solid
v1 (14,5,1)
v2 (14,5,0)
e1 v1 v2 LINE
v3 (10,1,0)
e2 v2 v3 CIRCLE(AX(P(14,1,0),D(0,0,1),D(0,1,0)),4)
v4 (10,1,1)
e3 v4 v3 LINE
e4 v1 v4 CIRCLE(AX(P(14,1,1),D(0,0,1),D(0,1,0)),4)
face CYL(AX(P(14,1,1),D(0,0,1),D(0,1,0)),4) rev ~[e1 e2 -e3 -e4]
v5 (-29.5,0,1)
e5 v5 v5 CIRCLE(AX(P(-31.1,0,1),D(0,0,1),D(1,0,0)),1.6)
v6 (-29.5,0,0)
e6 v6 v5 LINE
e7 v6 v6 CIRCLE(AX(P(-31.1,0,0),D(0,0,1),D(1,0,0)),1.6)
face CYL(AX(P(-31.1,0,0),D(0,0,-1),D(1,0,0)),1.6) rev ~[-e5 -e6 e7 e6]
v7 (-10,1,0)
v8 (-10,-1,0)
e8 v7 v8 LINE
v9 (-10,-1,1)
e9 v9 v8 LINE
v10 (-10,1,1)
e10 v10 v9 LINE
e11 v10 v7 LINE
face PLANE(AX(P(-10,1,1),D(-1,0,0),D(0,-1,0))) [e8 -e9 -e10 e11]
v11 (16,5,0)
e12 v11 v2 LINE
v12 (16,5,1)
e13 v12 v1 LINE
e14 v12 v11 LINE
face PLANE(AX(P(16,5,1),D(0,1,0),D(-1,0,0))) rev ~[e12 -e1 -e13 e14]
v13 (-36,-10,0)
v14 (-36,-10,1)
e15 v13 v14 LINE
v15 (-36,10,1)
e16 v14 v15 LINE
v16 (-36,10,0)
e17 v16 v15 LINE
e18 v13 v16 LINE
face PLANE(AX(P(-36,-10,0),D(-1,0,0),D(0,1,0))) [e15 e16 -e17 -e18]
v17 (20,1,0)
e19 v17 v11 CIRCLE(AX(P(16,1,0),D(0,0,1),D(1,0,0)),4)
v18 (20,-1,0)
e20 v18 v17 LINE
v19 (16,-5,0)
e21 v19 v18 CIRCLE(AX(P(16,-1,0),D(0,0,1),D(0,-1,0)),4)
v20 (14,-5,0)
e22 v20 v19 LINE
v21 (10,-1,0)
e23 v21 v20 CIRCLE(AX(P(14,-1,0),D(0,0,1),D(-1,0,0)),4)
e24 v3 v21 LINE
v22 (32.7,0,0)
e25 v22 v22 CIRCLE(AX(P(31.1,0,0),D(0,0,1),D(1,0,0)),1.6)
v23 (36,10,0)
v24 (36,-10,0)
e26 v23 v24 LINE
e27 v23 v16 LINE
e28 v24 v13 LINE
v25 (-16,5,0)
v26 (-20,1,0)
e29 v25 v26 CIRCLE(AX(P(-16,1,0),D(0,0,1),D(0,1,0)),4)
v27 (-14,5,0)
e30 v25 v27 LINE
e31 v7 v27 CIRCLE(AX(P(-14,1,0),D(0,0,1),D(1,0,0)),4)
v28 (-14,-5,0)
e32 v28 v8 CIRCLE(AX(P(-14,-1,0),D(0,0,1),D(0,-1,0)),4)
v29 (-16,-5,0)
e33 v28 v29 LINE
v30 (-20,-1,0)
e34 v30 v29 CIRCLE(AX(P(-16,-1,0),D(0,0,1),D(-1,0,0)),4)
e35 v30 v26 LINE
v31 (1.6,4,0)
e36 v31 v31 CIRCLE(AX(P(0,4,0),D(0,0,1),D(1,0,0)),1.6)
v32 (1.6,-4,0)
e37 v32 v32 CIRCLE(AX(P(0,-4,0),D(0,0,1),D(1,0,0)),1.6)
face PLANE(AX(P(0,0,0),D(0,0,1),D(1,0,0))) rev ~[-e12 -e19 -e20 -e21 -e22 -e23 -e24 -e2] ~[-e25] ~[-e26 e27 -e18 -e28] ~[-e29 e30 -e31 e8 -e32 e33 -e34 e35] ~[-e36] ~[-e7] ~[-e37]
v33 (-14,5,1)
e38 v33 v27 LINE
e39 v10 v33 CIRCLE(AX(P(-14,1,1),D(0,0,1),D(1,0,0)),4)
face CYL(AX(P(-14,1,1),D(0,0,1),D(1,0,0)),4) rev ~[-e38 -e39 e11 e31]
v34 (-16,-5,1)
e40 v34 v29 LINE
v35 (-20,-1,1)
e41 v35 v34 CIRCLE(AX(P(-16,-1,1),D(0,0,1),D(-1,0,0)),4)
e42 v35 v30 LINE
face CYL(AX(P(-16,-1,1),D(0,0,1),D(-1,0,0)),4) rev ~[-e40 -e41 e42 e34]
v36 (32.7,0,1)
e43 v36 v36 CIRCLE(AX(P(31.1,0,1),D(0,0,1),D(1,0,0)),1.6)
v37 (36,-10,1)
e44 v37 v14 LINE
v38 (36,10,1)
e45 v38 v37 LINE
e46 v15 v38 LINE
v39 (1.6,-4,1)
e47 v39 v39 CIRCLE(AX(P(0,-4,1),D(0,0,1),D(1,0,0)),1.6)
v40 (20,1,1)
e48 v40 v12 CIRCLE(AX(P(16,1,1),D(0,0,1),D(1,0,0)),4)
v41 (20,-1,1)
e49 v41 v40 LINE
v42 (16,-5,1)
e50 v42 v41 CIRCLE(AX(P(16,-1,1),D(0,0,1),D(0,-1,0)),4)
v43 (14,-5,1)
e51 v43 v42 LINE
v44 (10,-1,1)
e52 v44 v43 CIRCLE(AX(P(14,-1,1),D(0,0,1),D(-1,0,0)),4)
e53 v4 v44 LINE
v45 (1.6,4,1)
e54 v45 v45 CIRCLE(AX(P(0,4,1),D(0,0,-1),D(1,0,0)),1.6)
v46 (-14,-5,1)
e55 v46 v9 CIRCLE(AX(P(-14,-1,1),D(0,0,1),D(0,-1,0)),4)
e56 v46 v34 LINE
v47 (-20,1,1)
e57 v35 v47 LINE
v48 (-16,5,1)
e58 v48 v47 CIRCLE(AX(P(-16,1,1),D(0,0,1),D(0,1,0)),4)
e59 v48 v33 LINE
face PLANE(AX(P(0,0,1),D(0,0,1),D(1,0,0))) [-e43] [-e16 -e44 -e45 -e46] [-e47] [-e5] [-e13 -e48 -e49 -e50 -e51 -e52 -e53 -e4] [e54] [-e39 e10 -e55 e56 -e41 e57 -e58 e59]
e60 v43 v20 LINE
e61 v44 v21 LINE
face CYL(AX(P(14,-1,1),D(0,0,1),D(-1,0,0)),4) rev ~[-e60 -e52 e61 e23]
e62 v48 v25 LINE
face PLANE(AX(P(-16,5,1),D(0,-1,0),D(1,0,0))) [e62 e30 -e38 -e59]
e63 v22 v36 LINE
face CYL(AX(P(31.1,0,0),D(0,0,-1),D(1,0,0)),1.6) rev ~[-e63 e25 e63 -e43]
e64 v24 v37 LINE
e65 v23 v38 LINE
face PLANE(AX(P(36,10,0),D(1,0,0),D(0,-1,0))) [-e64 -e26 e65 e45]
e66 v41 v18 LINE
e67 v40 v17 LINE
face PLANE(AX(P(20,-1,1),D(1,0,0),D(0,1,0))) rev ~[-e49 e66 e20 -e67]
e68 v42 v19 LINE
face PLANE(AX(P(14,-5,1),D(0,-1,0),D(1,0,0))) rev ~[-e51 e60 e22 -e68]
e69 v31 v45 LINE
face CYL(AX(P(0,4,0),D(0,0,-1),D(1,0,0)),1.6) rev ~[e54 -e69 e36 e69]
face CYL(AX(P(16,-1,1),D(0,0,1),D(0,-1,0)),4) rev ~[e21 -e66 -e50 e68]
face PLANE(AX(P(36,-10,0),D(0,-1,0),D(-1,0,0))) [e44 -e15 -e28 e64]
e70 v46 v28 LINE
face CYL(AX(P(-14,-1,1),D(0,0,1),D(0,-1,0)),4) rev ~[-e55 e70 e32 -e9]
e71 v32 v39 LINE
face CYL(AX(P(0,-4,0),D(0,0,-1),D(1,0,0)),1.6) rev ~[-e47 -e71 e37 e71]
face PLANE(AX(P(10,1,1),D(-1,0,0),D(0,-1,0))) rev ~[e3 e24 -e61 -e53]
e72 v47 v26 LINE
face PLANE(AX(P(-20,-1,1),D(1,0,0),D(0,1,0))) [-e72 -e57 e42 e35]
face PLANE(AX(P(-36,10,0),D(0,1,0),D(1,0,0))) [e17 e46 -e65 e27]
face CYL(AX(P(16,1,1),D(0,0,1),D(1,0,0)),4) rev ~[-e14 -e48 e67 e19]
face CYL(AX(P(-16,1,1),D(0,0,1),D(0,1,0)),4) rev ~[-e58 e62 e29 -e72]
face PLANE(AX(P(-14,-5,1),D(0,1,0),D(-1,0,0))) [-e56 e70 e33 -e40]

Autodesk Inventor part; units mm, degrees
ref_plane "YZ Plane" through (0, 0, 0) normal (1, 0, 0) x (0, 1, 0)
ref_plane "XZ Plane" through (0, 0, 0) normal (0, 1, 0) x (-1, 0, 0)
ref_plane "XY Plane" through (0, 0, 0) normal (0, 0, 1) x (1, 0, 0)
sketch "Sketch2" plane through (0, 0, 1) normal (0, 0, 1) x (1, 0, 0)
  line L0 (-17.5, 32.5) -> (-12.5, 32.5)
  line L1 (-7.5, 27.5) -> (-7.5, 12.5)
  line L2 (-12.5, 7.5) -> (-17.5, 7.5)
  line L3 (-22.5, 12.5) -> (-22.5, 27.5)
  line L4 (-22.5, 32.5) -> (-7.5, 7.5) construction
  line L5 (-7.5, 32.5) -> (-22.5, 7.5) construction
  line L6 (-15.4861, 0) -> (17.9861, 0)
  line L7 (0, 18.4722) -> (0, -18.4722)
  arc A0 (-17.5, 32.5) -> (-22.5, 27.5) centre (-17.5, 27.5) ccw
  arc A1 (-7.5, 27.5) -> (-12.5, 32.5) centre (-12.5, 27.5) ccw
  arc A2 (-12.5, 7.5) -> (-7.5, 12.5) centre (-12.5, 12.5) ccw
  arc A3 (-22.5, 12.5) -> (-17.5, 7.5) centre (-17.5, 12.5) ccw
  line L8 (17.5, 32.5) -> (12.5, 32.5)
  line L9 (7.5, 27.5) -> (7.5, 12.5)
  line L10 (12.5, 7.5) -> (17.5, 7.5)
  line L11 (22.5, 12.5) -> (22.5, 27.5)
  line L12 (22.5, 32.5) -> (7.5, 7.5) construction
  line L13 (7.5, 32.5) -> (22.5, 7.5) construction
  arc A4 (22.5, 27.5) -> (17.5, 32.5) centre (17.5, 27.5) ccw
  arc A5 (12.5, 32.5) -> (7.5, 27.5) centre (12.5, 27.5) ccw
  arc A6 (7.5, 12.5) -> (12.5, 7.5) centre (12.5, 12.5) ccw
  arc A7 (17.5, 7.5) -> (22.5, 12.5) centre (17.5, 12.5) ccw
  line L14 (-17.5, -32.5) -> (-12.5, -32.5)
  line L15 (-7.5, -27.5) -> (-7.5, -12.5)
  line L16 (-12.5, -7.5) -> (-17.5, -7.5)
  line L17 (-22.5, -12.5) -> (-22.5, -27.5)
  line L18 (-22.5, -32.5) -> (-7.5, -7.5) construction
  line L19 (-7.5, -32.5) -> (-22.5, -7.5) construction
  arc A8 (-22.5, -27.5) -> (-17.5, -32.5) centre (-17.5, -27.5) ccw
  arc A9 (-12.5, -32.5) -> (-7.5, -27.5) centre (-12.5, -27.5) ccw
  arc A10 (-7.5, -12.5) -> (-12.5, -7.5) centre (-12.5, -12.5) ccw
  arc A11 (-17.5, -7.5) -> (-22.5, -12.5) centre (-17.5, -12.5) ccw
  line L20 (12.5, -7.5) -> (17.5, -7.5)
  line L21 (7.5, -27.5) -> (7.5, -12.5)
  arc A12 (22.5, -12.5) -> (17.5, -7.5) centre (17.5, -12.5) ccw
  arc A13 (7.5, -27.5) -> (12.5, -32.5) centre (12.5, -27.5) ccw
  line L22 (17.5, -32.5) -> (12.5, -32.5)
  line L23 (7.5, -32.5) -> (22.5, -7.5) construction
  line L24 (22.5, -32.5) -> (7.5, -7.5) construction
  line L25 (22.5, -12.5) -> (22.5, -27.5)
  arc A14 (17.5, -32.5) -> (22.5, -27.5) centre (17.5, -27.5) ccw
  arc A15 (12.5, -7.5) -> (7.5, -12.5) centre (12.5, -12.5) ccw
  point P0 (0, 0)
  point P1 (-15, 20)
  point P2 (15, 20)
  point P3 (-15, -20)
  point P4 (15, -20)
  dimension "d11" = 15
  dimension "d12" = 15
  dimension "d13" = 25
  dimension "d14" = 15
  dimension "d15" = 5
sketch "Sketch1" plane through (0, 0, 0) normal (0, 0, 1) x (1, 0, 0)
  line L0 (-36, 10) -> (36, 10)
  line L1 (36, 10) -> (36, -10)
  line L2 (36, -10) -> (-36, -10)
  line L3 (-36, -10) -> (-36, 10)
  line L4 (-36, 10) -> (36, -10) construction
  line L5 (36, 10) -> (-36, -10) construction
  circle A0 centre (31.1, 0) radius 1.6
  line L6 (0, 0) -> (12.8976, 0)
  line L7 (0, 0) -> (0, 11.3109)
  circle A1 centre (-31.1, 0) radius 1.6
  circle A2 centre (0, -4) radius 1.6
  circle A3 centre (0, 4) radius 1.6
  dimension "d0" = 72
  dimension "d1" = 20
  dimension "d2" = 3.2
  dimension "d3" = 4.9
  dimension "d6" = 3.2
  dimension "d7" = 6
extrude "Plate1" add sketch "Sketch1" along normal blind 1
sketch "Sketch3" plane through (0, 0, 1) normal (0, 0, 1) x (1, 0, 0)
  line L0 (-16, 5) -> (-14, 5)
  line L1 (-10, 1) -> (-10, -1)
  line L2 (-14, -5) -> (-16, -5)
  line L3 (-20, -1) -> (-20, 1)
  line L4 (-20, 5) -> (-10, -5) construction
  line L5 (-10, 5) -> (-20, -5) construction
  arc A0 (-16, 5) -> (-20, 1) centre (-16, 1) ccw
  arc A1 (-20, -1) -> (-16, -5) centre (-16, -1) ccw
  arc A2 (-14, -5) -> (-10, -1) centre (-14, -1) ccw
  arc A3 (-10, 1) -> (-14, 5) centre (-14, 1) ccw
  line L6 (0, 0) -> (0, 13.3665)
  line L7 (16, 5) -> (14, 5)
  line L8 (10, 1) -> (10, -1)
  line L9 (14, -5) -> (16, -5)
  line L10 (20, -1) -> (20, 1)
  line L11 (20, 5) -> (10, -5) construction
  line L12 (10, 5) -> (20, -5) construction
  arc A4 (20, 1) -> (16, 5) centre (16, 1) ccw
  arc A5 (16, -5) -> (20, -1) centre (16, -1) ccw
  arc A6 (10, -1) -> (14, -5) centre (14, -1) ccw
  arc A7 (14, 5) -> (10, 1) centre (14, 1) ccw
  point P0 (-15, 0)
  point P1 (15, 0)
  dimension "d18" = 10
  dimension "d19" = 10
  dimension "d20" = 4
  dimension "d21" = 20
extrude "Cut2" cut sketch "Sketch3" against normal blind 1
equation "\"d22\" = 厚度"
equation "\"d5\" = 厚度"
equation "\"折彎半徑\" = 厚度"
equation "\"折彎離隙寬度\" = 厚度"
equation "\"折彎離隙深度\" = 0.5 * 厚度"
equation "\"轉角離隙大小\" = 4 * 厚度"
equation "\"最小剩餘\" = 2 * 厚度"
equation "\"轉移半徑\" = 折彎半徑"
equation "\"Jacobi半徑大小\" = 折彎半徑"
equation "\"間隙大小\" = 厚度"
equation "\"厚度\" = 1"
properties part number "battery_box_5V_front" material "Aluminum"
